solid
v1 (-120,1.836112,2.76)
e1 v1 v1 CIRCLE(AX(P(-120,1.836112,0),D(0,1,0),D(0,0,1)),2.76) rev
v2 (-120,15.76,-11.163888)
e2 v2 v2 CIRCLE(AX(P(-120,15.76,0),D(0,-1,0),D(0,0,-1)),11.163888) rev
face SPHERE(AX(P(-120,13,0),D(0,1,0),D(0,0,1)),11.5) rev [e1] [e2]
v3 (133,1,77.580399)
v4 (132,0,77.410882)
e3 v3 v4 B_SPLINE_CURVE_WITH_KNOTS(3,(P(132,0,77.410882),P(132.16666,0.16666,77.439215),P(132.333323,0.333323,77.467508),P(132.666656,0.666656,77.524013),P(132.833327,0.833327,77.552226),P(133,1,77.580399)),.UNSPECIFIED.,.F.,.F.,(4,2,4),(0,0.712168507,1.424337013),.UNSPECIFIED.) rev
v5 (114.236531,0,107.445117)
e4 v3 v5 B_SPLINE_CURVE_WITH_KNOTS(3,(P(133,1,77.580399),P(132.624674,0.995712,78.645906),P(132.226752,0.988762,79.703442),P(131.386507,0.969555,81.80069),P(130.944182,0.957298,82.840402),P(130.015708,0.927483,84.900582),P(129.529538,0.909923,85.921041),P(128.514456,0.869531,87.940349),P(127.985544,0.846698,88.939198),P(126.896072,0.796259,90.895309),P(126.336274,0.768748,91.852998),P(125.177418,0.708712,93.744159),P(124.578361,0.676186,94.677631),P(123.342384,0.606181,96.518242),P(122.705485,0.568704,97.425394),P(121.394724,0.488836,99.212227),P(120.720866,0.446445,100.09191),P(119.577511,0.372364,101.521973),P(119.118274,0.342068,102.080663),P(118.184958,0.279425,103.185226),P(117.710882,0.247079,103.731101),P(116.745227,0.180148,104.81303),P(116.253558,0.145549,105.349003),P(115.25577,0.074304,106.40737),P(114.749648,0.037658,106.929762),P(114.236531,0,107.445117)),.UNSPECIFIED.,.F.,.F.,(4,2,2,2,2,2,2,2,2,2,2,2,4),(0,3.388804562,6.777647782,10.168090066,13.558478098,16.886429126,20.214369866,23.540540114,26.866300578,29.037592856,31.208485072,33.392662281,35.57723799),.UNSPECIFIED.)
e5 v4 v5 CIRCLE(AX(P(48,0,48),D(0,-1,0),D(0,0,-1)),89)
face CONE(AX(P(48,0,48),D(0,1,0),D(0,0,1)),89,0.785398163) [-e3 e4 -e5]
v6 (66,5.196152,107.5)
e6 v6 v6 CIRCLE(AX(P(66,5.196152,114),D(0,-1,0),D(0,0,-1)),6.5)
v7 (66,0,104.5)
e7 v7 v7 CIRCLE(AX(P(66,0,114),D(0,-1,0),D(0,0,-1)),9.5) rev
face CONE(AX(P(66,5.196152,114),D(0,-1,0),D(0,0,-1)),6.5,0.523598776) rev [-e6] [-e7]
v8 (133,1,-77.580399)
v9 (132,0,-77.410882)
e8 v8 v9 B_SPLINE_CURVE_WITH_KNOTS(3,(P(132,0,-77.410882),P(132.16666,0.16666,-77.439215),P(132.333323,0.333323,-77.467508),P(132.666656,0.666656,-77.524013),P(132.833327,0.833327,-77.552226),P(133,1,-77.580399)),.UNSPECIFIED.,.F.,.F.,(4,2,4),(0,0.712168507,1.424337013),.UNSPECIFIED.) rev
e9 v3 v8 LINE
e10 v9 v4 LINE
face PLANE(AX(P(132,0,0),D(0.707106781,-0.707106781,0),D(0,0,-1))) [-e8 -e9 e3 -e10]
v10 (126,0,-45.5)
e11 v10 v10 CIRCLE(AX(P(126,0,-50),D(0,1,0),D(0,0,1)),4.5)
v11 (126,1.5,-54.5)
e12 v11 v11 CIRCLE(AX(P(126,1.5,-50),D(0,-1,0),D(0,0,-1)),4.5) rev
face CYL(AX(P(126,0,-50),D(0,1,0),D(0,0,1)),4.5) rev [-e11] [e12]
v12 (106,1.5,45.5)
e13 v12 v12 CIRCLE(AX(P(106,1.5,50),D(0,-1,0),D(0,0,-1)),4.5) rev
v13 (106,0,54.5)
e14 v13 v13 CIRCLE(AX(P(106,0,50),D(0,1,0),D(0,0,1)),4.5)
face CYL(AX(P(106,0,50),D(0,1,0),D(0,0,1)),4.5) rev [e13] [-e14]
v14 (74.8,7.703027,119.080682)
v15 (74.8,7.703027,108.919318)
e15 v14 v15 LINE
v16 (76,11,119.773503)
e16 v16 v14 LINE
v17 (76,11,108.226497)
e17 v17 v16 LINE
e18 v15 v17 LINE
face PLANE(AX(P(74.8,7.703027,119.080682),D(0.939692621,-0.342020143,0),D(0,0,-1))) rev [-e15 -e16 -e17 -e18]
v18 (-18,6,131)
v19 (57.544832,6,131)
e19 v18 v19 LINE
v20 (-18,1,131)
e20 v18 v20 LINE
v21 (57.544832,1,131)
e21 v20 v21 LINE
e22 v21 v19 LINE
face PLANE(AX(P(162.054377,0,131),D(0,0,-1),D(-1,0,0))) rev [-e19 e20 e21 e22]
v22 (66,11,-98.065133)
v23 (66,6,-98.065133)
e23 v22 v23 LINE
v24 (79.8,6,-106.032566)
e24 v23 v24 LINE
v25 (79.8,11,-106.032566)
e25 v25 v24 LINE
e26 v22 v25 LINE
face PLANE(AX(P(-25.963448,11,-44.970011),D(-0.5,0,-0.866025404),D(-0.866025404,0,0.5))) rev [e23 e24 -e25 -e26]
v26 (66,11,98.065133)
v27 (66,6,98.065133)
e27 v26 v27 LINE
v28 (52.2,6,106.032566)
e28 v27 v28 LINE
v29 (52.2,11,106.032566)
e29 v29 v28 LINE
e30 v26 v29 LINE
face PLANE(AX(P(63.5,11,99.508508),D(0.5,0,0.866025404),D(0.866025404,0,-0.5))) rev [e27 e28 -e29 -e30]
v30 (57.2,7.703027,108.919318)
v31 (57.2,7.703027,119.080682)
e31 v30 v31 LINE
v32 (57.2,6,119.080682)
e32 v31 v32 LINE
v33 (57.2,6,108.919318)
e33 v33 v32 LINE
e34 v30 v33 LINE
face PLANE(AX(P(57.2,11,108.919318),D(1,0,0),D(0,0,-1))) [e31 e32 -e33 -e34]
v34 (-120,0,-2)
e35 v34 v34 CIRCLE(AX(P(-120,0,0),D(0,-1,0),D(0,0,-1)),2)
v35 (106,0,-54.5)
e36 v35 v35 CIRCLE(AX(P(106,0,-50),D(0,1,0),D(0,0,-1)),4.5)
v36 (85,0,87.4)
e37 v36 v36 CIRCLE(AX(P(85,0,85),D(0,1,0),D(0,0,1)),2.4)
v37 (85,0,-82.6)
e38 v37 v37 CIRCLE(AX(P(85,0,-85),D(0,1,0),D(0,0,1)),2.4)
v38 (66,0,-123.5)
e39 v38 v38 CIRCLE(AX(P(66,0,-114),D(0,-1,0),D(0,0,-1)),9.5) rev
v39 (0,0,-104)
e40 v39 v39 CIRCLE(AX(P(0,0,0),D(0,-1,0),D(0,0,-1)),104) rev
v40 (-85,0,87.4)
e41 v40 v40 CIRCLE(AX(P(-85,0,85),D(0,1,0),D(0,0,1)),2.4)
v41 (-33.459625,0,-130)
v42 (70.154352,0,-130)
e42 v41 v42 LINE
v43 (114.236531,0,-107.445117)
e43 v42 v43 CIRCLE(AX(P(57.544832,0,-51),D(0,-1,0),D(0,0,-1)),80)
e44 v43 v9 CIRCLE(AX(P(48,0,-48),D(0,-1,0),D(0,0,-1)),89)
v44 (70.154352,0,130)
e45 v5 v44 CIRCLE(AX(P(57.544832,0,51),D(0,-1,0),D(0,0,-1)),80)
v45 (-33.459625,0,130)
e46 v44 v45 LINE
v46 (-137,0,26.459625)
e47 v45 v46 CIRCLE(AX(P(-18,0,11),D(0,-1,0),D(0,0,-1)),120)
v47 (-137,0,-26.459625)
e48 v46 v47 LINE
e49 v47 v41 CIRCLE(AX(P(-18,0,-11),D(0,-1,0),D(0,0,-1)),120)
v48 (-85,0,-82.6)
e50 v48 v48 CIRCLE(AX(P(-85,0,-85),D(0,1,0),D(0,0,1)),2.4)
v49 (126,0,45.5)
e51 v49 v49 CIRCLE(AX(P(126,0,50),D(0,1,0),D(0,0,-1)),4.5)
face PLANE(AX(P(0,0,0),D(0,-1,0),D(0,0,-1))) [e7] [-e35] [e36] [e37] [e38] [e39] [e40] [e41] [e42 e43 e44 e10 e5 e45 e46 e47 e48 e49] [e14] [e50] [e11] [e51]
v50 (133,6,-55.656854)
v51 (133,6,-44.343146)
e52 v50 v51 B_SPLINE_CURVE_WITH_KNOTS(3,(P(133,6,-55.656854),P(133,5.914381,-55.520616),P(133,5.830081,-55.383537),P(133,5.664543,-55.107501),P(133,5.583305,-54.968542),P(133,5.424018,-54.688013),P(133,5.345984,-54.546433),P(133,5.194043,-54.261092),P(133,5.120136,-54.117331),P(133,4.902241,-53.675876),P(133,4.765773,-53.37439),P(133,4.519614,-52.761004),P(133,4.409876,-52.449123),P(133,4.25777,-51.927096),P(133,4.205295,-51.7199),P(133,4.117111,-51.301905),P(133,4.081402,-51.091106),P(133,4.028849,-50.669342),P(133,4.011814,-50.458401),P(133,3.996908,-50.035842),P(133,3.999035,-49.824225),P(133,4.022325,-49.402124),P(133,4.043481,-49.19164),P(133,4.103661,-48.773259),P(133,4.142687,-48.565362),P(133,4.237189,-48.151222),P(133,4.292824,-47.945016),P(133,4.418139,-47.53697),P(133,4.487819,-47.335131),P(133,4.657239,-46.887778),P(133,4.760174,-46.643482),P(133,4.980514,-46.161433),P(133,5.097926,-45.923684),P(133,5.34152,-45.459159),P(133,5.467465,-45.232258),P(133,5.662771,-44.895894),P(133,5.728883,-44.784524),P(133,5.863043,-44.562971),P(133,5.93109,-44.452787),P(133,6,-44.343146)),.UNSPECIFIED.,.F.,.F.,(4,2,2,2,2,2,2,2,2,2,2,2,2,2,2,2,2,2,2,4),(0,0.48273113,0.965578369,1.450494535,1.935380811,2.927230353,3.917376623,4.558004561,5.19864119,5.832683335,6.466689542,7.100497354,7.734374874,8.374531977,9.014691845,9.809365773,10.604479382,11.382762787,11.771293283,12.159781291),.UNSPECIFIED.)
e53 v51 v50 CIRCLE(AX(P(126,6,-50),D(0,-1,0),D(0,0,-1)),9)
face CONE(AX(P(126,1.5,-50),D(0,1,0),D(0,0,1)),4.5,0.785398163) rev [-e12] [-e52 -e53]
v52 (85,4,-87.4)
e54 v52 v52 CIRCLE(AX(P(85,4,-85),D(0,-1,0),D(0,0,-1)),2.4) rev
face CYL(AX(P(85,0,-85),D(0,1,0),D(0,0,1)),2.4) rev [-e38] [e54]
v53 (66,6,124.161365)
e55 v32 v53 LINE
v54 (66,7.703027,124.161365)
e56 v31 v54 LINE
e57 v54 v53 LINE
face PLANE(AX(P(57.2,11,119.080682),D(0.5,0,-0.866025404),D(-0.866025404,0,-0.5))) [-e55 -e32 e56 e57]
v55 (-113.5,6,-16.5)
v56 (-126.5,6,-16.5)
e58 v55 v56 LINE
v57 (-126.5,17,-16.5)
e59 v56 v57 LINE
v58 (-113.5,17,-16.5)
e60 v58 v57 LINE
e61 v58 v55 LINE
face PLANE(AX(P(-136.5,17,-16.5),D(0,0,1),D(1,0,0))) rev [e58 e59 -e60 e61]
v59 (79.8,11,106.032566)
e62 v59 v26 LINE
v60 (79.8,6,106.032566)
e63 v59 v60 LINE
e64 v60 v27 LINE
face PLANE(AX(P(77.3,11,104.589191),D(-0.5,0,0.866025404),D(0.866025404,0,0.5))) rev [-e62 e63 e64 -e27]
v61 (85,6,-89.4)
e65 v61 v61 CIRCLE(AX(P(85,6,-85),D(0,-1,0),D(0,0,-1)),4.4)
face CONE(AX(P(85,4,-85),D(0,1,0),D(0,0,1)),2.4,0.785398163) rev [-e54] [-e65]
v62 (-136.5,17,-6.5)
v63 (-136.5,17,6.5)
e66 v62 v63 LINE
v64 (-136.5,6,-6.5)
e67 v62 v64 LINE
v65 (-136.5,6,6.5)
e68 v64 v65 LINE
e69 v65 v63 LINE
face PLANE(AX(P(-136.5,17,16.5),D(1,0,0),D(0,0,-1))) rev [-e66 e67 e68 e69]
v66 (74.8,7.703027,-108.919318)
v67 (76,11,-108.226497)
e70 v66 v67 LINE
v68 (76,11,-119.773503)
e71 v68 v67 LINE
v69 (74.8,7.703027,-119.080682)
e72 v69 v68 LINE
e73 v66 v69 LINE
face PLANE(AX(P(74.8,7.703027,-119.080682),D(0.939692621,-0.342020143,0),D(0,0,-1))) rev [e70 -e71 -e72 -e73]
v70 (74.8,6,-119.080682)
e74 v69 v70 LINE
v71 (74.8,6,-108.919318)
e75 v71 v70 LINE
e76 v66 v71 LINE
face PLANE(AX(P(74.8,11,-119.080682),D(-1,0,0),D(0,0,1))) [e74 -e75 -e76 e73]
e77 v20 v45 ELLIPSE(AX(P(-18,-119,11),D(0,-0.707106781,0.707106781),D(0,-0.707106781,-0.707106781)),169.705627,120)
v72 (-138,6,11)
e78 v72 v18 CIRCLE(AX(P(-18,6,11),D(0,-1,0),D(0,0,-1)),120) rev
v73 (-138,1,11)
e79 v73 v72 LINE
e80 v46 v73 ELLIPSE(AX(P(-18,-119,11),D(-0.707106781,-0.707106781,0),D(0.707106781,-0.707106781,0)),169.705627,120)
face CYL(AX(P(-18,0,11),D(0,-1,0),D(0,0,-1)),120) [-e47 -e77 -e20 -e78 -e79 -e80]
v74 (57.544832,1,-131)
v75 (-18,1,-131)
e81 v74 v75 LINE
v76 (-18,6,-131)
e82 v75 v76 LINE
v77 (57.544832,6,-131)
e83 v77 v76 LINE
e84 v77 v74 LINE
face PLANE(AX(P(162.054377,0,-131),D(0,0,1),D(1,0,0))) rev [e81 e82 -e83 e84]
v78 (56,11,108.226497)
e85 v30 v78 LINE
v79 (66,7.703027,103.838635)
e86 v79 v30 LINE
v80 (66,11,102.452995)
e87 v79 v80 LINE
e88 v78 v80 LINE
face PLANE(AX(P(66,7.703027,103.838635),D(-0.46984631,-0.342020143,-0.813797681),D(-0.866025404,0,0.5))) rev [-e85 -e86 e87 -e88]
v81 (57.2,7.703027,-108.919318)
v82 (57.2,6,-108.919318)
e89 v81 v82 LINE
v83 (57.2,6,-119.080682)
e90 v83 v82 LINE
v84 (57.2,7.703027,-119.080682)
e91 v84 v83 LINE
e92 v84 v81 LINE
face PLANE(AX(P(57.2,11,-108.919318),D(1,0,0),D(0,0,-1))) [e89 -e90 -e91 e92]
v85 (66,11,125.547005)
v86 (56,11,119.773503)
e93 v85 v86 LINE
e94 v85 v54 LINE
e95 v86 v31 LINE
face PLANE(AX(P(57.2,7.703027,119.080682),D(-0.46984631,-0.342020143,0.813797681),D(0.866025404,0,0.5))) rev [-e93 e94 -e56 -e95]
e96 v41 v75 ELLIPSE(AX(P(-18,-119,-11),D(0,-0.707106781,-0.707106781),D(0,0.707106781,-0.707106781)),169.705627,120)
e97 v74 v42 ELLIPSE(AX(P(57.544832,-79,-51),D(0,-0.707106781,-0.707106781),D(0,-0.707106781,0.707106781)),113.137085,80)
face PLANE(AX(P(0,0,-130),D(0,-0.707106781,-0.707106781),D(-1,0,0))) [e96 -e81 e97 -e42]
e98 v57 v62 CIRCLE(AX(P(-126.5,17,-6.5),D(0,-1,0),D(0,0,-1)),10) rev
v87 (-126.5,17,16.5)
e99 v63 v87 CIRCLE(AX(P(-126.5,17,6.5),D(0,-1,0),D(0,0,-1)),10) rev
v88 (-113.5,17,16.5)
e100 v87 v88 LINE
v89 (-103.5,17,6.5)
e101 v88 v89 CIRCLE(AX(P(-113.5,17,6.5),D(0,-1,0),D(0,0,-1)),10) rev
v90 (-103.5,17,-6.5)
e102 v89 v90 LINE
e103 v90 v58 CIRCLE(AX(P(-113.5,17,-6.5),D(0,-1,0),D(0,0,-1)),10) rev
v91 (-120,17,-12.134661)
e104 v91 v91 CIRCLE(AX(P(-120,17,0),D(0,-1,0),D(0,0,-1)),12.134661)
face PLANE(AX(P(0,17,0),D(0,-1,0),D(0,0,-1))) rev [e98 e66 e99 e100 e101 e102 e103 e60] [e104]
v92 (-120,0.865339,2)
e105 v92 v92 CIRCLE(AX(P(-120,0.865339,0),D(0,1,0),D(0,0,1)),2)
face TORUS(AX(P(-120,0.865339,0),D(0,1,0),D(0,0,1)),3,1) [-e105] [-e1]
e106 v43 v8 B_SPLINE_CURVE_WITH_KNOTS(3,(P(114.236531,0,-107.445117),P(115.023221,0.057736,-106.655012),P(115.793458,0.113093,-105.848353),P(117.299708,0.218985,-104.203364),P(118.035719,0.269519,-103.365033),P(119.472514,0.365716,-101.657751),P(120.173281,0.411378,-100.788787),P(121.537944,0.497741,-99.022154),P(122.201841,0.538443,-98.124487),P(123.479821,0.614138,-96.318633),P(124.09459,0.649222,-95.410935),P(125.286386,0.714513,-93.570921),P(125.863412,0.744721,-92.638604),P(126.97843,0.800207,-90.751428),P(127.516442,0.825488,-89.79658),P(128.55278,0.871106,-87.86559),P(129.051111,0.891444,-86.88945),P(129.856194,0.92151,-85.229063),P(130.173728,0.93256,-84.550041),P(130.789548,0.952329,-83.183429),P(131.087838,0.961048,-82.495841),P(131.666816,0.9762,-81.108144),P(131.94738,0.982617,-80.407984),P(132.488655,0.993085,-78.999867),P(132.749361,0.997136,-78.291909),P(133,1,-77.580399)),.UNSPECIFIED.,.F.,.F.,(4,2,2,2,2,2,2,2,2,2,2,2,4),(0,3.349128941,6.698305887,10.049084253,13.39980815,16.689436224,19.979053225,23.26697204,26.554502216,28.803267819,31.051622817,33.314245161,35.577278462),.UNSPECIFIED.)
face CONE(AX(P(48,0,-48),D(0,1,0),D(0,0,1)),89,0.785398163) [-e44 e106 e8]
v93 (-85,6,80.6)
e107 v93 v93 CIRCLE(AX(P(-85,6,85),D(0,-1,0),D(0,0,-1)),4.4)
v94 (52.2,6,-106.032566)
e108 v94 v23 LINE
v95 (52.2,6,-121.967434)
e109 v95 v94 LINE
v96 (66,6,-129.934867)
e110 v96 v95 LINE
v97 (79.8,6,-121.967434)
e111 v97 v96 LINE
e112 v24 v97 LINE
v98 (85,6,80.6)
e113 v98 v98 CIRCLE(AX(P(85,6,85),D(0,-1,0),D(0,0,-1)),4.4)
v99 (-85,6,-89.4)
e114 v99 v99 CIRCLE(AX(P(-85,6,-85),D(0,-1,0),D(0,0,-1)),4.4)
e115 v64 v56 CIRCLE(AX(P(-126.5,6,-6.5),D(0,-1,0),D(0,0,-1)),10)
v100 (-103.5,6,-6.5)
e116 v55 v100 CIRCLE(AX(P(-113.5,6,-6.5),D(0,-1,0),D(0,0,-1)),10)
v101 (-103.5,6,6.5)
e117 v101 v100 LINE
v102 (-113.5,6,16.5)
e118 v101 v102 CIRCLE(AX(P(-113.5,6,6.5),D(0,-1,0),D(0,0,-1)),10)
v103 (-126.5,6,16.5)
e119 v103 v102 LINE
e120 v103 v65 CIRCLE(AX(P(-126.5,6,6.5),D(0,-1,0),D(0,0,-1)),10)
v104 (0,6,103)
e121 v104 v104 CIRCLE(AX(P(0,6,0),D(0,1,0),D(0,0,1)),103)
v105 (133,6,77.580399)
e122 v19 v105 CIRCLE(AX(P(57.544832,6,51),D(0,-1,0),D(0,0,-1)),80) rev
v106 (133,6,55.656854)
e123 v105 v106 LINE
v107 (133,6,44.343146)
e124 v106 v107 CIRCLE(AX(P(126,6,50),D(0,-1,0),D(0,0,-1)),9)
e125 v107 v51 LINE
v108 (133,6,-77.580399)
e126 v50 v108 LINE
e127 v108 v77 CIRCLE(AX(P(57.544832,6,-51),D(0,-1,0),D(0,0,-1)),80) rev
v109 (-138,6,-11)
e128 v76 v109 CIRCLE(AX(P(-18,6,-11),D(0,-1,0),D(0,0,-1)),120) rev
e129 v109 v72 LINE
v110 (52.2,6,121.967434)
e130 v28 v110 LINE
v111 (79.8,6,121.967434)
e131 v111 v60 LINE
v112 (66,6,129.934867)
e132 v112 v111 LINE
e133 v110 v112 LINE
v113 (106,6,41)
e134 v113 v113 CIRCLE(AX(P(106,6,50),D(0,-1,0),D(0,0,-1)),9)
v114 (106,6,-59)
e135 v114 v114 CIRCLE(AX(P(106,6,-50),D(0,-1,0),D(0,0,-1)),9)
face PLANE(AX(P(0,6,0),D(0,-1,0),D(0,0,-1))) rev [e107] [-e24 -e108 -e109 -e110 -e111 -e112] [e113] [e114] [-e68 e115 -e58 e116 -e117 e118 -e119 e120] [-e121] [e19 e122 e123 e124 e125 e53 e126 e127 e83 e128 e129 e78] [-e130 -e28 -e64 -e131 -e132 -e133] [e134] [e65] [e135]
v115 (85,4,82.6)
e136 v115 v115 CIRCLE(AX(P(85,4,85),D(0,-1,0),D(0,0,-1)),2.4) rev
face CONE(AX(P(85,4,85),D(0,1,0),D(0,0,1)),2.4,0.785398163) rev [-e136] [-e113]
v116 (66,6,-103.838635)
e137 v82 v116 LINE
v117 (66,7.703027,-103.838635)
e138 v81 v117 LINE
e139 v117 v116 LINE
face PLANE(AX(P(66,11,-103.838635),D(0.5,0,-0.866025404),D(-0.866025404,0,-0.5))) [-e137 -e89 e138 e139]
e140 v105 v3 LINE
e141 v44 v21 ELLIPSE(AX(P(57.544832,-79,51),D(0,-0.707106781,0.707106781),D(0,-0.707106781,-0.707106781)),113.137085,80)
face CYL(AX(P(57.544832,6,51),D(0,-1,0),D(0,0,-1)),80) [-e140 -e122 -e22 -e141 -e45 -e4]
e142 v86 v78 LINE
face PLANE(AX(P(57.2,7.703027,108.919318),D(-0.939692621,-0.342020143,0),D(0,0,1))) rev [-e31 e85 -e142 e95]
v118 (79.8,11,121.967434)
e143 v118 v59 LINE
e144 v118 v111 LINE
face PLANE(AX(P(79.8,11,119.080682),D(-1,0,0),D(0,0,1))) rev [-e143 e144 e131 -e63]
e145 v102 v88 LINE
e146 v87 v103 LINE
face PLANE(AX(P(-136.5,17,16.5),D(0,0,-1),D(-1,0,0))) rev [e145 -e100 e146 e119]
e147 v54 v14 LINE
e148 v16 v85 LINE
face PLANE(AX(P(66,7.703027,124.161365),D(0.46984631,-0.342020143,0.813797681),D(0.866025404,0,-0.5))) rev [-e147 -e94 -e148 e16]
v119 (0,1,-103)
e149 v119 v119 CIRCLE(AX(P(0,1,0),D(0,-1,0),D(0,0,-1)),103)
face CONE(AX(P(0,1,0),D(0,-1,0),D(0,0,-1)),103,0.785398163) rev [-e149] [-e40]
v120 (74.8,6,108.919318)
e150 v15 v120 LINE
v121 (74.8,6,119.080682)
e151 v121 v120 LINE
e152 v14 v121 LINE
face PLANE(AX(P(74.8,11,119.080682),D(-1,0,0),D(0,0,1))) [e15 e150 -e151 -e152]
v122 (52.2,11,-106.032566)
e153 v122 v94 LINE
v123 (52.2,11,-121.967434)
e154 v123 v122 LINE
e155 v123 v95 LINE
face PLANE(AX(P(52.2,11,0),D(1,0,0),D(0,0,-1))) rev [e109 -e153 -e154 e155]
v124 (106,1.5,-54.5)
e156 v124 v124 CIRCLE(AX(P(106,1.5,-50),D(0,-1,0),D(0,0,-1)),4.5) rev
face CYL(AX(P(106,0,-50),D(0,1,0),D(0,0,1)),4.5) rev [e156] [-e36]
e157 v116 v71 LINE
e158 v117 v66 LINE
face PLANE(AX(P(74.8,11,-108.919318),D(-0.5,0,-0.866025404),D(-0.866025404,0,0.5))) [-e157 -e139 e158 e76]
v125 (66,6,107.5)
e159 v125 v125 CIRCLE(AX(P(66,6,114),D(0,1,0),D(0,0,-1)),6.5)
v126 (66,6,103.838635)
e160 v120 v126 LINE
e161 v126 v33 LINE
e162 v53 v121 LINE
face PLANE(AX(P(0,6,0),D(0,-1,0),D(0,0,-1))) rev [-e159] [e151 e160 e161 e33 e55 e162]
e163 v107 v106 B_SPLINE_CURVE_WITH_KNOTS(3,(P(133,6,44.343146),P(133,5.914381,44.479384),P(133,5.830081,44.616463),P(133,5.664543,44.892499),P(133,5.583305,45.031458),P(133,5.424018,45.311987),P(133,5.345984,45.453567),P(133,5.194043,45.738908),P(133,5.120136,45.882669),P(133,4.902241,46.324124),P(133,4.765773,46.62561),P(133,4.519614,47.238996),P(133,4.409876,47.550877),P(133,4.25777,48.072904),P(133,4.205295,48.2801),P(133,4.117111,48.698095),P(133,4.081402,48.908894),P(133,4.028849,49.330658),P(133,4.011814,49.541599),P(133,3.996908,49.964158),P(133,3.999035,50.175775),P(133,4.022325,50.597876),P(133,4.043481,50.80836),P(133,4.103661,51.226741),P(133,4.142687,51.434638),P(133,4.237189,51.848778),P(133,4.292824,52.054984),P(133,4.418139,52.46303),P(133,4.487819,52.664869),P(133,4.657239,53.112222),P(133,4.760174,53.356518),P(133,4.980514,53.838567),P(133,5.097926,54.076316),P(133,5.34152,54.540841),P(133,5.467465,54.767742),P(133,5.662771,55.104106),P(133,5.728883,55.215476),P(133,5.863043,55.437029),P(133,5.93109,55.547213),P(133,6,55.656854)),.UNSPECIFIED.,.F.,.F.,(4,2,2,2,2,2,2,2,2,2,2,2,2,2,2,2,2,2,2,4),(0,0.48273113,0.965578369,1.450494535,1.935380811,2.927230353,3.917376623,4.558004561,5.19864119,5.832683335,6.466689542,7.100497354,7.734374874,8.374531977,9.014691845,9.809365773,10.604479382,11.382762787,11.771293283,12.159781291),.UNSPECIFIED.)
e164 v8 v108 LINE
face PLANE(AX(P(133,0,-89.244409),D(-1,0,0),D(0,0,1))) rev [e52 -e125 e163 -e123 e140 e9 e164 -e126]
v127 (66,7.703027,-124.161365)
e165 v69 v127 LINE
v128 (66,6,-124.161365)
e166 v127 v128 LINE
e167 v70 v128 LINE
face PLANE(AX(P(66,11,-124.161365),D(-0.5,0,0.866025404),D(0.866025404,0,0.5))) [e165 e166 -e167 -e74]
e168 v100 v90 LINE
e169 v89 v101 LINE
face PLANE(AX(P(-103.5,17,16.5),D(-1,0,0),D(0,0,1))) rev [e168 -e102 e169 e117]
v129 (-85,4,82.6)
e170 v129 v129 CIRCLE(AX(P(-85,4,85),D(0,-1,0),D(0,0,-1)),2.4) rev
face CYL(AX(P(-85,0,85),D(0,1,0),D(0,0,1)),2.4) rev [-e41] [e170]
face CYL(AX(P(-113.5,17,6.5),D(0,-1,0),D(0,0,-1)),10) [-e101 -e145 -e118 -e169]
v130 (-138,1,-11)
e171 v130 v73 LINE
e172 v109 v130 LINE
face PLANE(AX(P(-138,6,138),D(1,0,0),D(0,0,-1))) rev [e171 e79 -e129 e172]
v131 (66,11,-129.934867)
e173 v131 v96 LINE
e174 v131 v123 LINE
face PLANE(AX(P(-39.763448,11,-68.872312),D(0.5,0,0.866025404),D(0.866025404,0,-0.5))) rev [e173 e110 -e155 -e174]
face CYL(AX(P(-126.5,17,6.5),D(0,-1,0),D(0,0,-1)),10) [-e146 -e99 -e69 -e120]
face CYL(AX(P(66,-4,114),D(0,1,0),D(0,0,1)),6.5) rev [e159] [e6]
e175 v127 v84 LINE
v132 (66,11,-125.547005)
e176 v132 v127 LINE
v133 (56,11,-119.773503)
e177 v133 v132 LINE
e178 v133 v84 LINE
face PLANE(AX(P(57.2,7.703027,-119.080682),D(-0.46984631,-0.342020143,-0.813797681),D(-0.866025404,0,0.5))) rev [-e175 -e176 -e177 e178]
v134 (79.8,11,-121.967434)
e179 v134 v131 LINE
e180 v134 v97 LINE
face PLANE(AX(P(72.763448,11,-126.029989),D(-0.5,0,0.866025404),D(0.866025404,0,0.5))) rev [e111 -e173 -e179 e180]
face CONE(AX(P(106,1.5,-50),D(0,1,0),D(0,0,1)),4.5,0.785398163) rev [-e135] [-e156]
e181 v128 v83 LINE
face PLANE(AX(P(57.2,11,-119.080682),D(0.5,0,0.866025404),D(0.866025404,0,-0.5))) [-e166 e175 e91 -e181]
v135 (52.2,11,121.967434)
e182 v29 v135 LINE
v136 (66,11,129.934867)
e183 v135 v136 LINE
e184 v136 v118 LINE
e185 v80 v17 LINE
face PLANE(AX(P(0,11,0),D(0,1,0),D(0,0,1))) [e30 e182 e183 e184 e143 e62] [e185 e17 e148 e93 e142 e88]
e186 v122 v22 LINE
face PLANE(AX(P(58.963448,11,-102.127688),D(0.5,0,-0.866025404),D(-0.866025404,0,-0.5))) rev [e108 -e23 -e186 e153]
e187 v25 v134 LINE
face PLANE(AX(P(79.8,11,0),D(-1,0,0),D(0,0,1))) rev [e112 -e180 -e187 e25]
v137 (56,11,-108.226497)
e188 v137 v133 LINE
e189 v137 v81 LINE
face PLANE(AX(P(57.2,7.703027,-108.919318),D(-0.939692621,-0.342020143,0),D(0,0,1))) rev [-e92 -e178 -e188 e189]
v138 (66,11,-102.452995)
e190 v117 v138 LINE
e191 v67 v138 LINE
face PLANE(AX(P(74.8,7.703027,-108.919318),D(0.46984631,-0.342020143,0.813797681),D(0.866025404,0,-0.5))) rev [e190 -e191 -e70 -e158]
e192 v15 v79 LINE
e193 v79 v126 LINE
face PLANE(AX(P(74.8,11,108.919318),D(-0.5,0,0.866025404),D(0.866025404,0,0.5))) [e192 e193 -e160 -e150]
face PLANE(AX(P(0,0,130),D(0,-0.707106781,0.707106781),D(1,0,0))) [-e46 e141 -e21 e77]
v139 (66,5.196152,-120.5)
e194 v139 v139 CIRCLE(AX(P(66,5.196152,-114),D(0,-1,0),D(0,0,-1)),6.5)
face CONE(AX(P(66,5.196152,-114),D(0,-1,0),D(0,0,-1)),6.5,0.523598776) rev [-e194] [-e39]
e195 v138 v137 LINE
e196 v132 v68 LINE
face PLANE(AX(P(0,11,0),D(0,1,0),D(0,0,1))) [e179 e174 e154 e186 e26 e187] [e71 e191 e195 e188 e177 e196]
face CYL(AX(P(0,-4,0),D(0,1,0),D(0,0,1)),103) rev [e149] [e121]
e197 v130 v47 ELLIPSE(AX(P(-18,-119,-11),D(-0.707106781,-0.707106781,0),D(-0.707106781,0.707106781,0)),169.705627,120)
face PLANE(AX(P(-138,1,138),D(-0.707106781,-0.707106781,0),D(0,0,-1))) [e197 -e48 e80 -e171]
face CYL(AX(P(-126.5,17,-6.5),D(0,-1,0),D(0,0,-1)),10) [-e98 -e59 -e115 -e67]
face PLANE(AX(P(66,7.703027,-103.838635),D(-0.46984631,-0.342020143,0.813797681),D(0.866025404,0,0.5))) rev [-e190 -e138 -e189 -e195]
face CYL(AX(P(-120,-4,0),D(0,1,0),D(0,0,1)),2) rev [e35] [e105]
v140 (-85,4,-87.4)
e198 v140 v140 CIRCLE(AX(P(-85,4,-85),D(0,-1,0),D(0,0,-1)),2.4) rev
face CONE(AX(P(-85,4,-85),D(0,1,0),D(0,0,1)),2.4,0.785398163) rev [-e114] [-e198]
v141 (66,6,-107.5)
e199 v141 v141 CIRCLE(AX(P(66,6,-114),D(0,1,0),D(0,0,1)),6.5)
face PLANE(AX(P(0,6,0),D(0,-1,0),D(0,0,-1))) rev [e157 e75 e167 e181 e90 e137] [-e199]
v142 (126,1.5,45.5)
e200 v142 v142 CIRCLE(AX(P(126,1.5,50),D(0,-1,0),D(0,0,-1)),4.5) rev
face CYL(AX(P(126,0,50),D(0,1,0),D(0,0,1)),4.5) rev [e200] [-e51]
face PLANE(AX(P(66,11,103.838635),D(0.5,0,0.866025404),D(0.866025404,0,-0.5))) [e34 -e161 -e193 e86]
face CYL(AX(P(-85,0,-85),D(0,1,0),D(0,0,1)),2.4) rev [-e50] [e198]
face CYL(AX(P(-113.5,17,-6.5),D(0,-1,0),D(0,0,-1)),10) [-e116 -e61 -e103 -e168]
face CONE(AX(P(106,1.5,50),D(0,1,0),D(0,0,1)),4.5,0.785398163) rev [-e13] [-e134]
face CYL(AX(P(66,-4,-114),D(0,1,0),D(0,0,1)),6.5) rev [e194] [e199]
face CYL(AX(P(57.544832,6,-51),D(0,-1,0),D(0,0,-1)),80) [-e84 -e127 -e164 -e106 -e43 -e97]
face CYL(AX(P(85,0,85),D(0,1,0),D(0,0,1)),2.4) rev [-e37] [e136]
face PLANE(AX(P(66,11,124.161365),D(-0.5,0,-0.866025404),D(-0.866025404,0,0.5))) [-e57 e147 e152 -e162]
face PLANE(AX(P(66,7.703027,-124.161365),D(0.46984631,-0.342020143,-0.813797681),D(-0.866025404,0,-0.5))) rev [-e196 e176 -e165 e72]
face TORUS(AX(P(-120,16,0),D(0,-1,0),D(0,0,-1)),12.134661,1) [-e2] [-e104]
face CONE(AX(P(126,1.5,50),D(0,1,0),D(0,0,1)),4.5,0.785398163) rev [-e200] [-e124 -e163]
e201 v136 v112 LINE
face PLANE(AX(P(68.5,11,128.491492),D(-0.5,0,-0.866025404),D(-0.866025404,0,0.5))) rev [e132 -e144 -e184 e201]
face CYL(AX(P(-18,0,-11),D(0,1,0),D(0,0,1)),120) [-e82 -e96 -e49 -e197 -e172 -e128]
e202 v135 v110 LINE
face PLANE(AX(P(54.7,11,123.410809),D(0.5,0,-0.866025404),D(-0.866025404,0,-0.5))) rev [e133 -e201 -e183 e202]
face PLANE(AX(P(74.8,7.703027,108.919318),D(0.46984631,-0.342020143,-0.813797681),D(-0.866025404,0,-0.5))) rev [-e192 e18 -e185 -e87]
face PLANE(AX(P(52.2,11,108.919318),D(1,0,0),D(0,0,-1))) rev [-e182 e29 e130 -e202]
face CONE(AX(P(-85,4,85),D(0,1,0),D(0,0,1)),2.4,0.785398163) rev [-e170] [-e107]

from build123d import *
from OCP.BRepFilletAPI import BRepFilletAPI_MakeChamfer

# Parameters (mm, degrees)
SKETCH_1_W           = 276
SKETCH_1_H           = 276
EXTRUDE_1_DEPTH      = 6
SKETCH_4_R           = 6.5
SKETCH_4_R_2         = 2
CUT_EXTRUDE_1_DEPTH  = 10
SKETCH_5_R           = 2.4
CUT_EXTRUDE_2_DEPTH  = 196.253681143
FILLET_1_R           = 90
EXTRUDE_1_2_DEPTH    = 5
CHAMFER_2_SIZE       = 1.2
CHAMFER_2_SIZE2      = 3.296972903
SKETCH_9_W           = 33
SKETCH_9_H           = 33
EXTRUDE_2_DEPTH      = 11
FILLET_2_R           = 1
FILLET_3_R           = 10
CHAMFER_5_SIZE       = 3
CHAMFER_5_SIZE2      = 5.196152423
SKETCH_6_R           = 103
CUT_EXTRUDE_3_DEPTH  = 10
CHAMFER_6_SIZE       = 2
SKETCH_13_R          = 4.5
CUT_EXTRUDE_6_DEPTH  = 196.47122551
SKETCH_18_W          = 352.666964083
SKETCH_18_H          = 12.846548741
SKETCH_18_W_2        = 47.896370642
SKETCH_18_H_2        = 198.133814491
CUT_EXTRUDE_10_DEPTH = 196.900484949
CHAMFER_7_SIZE       = 4.5
CHAMFER_8_SIZE       = 1
FILLET_4_R           = 120
FILLET_5_R           = 80


with BuildPart() as part:
    # Эскиз1 → Extrude 1 (new body)
    with BuildSketch(Plane(origin=(0, 0, 0), x_dir=(1, 0, 0), z_dir=(0, 1, 0))):
        Rectangle(SKETCH_1_W, SKETCH_1_H)
    extrude(amount=EXTRUDE_1_DEPTH)

    # Эскиз4 → Cut-Extrude 1 (cut)
    with BuildSketch(Plane(origin=(0, 6, 0), x_dir=(1, 0, 0), z_dir=(0, 1, 0))):
        with Locations(Location((66, 114, 0), (0, 0, 270))):
            Circle(SKETCH_4_R)
        with Locations(Location((-120, 0, 0), (0, 0, 270))):
            Circle(SKETCH_4_R_2)
        with Locations(Location((66, -114, 0), (0, 0, 90))):
            Circle(SKETCH_4_R)
    extrude(amount=-CUT_EXTRUDE_1_DEPTH, mode=Mode.SUBTRACT)

    # Эскиз5 → Вырез-Вытянуть2 (cut, through all)
    with BuildSketch(Plane(origin=(0, 6, 0), x_dir=(1, 0, 0), z_dir=(0, 1, 0))):
        with Locations(Location((-85, 85, 0), (0, 0, 270))):
            Circle(SKETCH_5_R)
        with Locations(Location((85, 85, 0), (0, 0, 270))):
            Circle(SKETCH_5_R)
        with Locations(Location((85, -85, 0), (0, 0, 270))):
            Circle(SKETCH_5_R)
        with Locations(Location((-85, -85, 0), (0, 0, 270))):
            Circle(SKETCH_5_R)
        with Locations(Location((-90, 0, 0), (0, 0, 270))):
            Circle(SKETCH_5_R)
        with Locations(Location((0, 90, 0), (0, 0, 270))):
            Circle(SKETCH_5_R)
        with Locations(Location((0, -90, 0), (0, 0, 90))):
            Circle(SKETCH_5_R)
        with Locations(Location((90, 0, 0), (0, 0, 90))):
            Circle(SKETCH_5_R)
    extrude(amount=-CUT_EXTRUDE_2_DEPTH, mode=Mode.SUBTRACT)

    # Скругление1
    fillet_1_edges = [part.edges().sort_by_distance(p)[0] for p in [
        (138, 3, 138),
        (-138, 3, 138),
        (-138, 3, -138),
        (138, 3, -138),
    ]]
    fillet(fillet_1_edges, radius=FILLET_1_R)

    # Extrude 1 2: read off the stored shape, not the designer's step
    # Extrude 1 2 outline → Extrude 1 2 (add)
    # profile 1 of 2: a face of its own
    with BuildSketch(Plane(origin=(0, 6, 0), x_dir=(1, 0, 0), z_dir=(0, 1, 0))):
        Polygon((79.8, -106.032566285), (66, -98.06513257), (52.2, -106.032566285), (52.2, -121.967433715), (66, -129.93486743), (79.8, -121.967433715), align=None)
        Polygon((57.2, -108.919317631), (66, -103.838635262), (74.8, -108.919317631), (74.8, -119.080682369), (66, -124.161364738), (57.2, -119.080682369), align=None, mode=Mode.SUBTRACT)
    # profile 2 of 2: a face of its own
    with BuildSketch(Plane(origin=(0, 6, 0), x_dir=(1, 0, 0), z_dir=(0, 1, 0))):
        Polygon((52.2, 121.967433715), (52.2, 106.032566285), (66, 98.06513257), (79.8, 106.032566285), (79.8, 121.967433715), (66, 129.93486743), align=None)
        Polygon((66, 103.838635262), (57.2, 108.919317631), (57.2, 119.080682369), (66, 124.161364738), (74.8, 119.080682369), (74.8, 108.919317631), align=None, mode=Mode.SUBTRACT)
    extrude(amount=EXTRUDE_1_2_DEPTH)

    # Фаска2: one chamfer whose edges measure the first distance from different faces: ONE call of the kernel's chamfer builder (chamfer() names one face for all edges)
    chamfer_2_edges_1 = [part.edges().sort_by_distance(p)[0] for p in [
        (70.4, 11, 106.378976446),
        (61.6, 11, 106.378976447),
        (57.2, 11, 114),
        (61.6, 11, 121.621023554),
        (70.4, 11, 121.621023553),
        (74.8, 11, 114),
    ]]
    chamfer_2_side_1 = [part.faces().sort_by_distance(p)[0] for p in [
        (72.689201518, 11, 102.413963108),
    ]]
    chamfer_2_edges_2 = [part.edges().sort_by_distance(p)[0] for p in [
        (74.8, 11, -114),
        (70.4, 11, -121.621023554),
        (61.6, 11, -121.621023553),
        (57.2, 11, -114),
        (61.6, 11, -106.378976446),
        (70.4, 11, -106.378976447),
    ]]
    chamfer_2_side_2 = [part.faces().sort_by_distance(p)[0] for p in [
        (52.621596964, 11, -114),
    ]]
    chamfer_2 = BRepFilletAPI_MakeChamfer(part.part.solid().wrapped)
    for e in chamfer_2_edges_1:
        chamfer_2.Add(CHAMFER_2_SIZE, CHAMFER_2_SIZE2, e.wrapped, chamfer_2_side_1[0].wrapped)  # the first distance lies on this face
    for e in chamfer_2_edges_2:
        chamfer_2.Add(CHAMFER_2_SIZE, CHAMFER_2_SIZE2, e.wrapped, chamfer_2_side_2[0].wrapped)  # the first distance lies on this face
    add(Compound.cast(chamfer_2.Shape()), mode=Mode.REPLACE)

    # Эскиз9 → Бобышка-Вытянуть2 (add)
    with BuildSketch(Plane(origin=(0, 6, 0), x_dir=(1, 0, 0), z_dir=(0, 1, 0))):
        with Locations((-120, 0)):
            Rectangle(SKETCH_9_W, SKETCH_9_H)
    extrude(amount=EXTRUDE_2_DEPTH)

    # Эскиз10 → Вырез-Повернуть1 (revolve, cut)
    with BuildSketch(Plane(origin=(0, 13, 0), x_dir=(1, 0, 0), z_dir=(0, 1, 0))):
        with BuildLine():
            Line((-131.5, 0), (-108.5, 0))
            ThreePointArc((-108.5, 0), (-120, 11.5), (-131.5, 0))
        make_face()
    revolve(axis=Axis((-131.5, 13, 0), (1, 0, 0)), mode=Mode.SUBTRACT)

    # Скругление2
    fillet_2_edges = [part.edges().sort_by_distance(p)[0] for p in [
        (-119.999999999, 1.675248347, -1.999999986),
        (-120, 17, -10.781929326),
    ]]
    fillet(fillet_2_edges, radius=FILLET_2_R)

    # Скругление3
    fillet_3_edges = [part.edges().sort_by_distance(p)[0] for p in [
        (-103.5, 11.5, 16.5),
        (-103.5, 11.5, -16.5),
        (-136.5, 11.5, -16.5),
        (-136.5, 11.5, 16.5),
    ]]
    fillet(fillet_3_edges, radius=FILLET_3_R)

    # Фаска5
    chamfer_5_edges = [part.edges().sort_by_distance(p)[0] for p in [
        (66, 0, 120.5),
        (66, 0, -120.5),
    ]]
    chamfer_5_side = [part.faces().sort_by_distance(p)[0] for p in [
        (-0.232742345, 0, 0),
    ]]
    chamfer(chamfer_5_edges, length=CHAMFER_5_SIZE, length2=CHAMFER_5_SIZE2, reference=chamfer_5_side[0])

    # Эскиз6 → Вырез-Вытянуть3 (cut)
    with BuildSketch(Plane(origin=(0, 6, 0), x_dir=(1, 0, 0), z_dir=(0, 1, 0))):
        with Locations(Location((0, 0, 0), (0, 0, 270))):
            Circle(SKETCH_6_R)
    extrude(amount=-CUT_EXTRUDE_3_DEPTH, mode=Mode.SUBTRACT)

    # Фаска6
    chamfer_6_edges = [part.edges().sort_by_distance(p)[0] for p in [
        (85, 6, -87.4),
        (85, 6, 82.6),
        (-85, 6, 82.6),
        (-85, 6, -87.4),
    ]]
    chamfer(chamfer_6_edges, length=CHAMFER_6_SIZE)

    # Эскиз13 → Вырез-Вытянуть6 (cut, through all)
    with BuildSketch(Plane(origin=(0, 6, 0), x_dir=(1, 0, 0), z_dir=(0, 1, 0))):
        with Locations(Location((126, 50, 0), (0, 0, 270))):
            Circle(SKETCH_13_R)
        with Locations(Location((126, -50, 0), (0, 0, 90))):
            Circle(SKETCH_13_R)
        with Locations(Location((106, -50, 0), (0, 0, 270))):
            Circle(SKETCH_13_R)
        with Locations(Location((106, 50, 0), (0, 0, 90))):
            Circle(SKETCH_13_R)
    extrude(amount=-CUT_EXTRUDE_6_DEPTH, mode=Mode.SUBTRACT)

    # Эскиз18 → Вырез-Вытянуть10 (cut, through all)
    with BuildSketch(Plane(origin=(0, 17, 0), x_dir=(1, 0, 0), z_dir=(0, 1, 0))):
        with Locations((-14.279105497, 137.42327437)):
            Rectangle(SKETCH_18_W, SKETCH_18_H)
        with Locations((-14.279105497, -137.42327437)):
            Rectangle(SKETCH_18_W, SKETCH_18_H)
        with Locations((156.948185321, -9.822497885)):
            Rectangle(SKETCH_18_W_2, SKETCH_18_H_2)
    extrude(amount=-CUT_EXTRUDE_10_DEPTH, mode=Mode.SUBTRACT)

    # Фаска7
    # the kernel refuses this chamfer: 4.5 mm, written as the material it takes off along each edge
    with BuildSketch(Plane(origin=(106, 6, -50), x_dir=(0, 0, -1), z_dir=(1, 0, 0))) as chamfer_7_piece_1:
        Polygon((4.5 + CHAMFER_7_SIZE, 0), (4.5, -CHAMFER_7_SIZE), (4.5, 0), align=None)
    revolve(axis=Axis((106, 6, -50), (0, 1, 0)), mode=Mode.SUBTRACT)
    with BuildSketch(Plane(origin=(106, 6, 50), x_dir=(0, 0, 1), z_dir=(-1, 0, 0))) as chamfer_7_piece_2:
        Polygon((4.5 + CHAMFER_7_SIZE, 0), (4.5, -CHAMFER_7_SIZE), (4.5, 0), align=None)
    revolve(axis=Axis((106, 6, 50), (0, 1, 0)), mode=Mode.SUBTRACT)
    with BuildSketch(Plane(origin=(126, 6, 50), x_dir=(0, 0, -1), z_dir=(1, 0, 0))) as chamfer_7_piece_3:
        Polygon((4.5 + CHAMFER_7_SIZE, 0), (4.5, -CHAMFER_7_SIZE), (4.5, 0), align=None)
    revolve(axis=Axis((126, 6, 50), (0, 1, 0)), mode=Mode.SUBTRACT)
    with BuildSketch(Plane(origin=(126, 6, -50), x_dir=(0, 0, 1), z_dir=(-1, 0, 0))) as chamfer_7_piece_4:
        Polygon((4.5 + CHAMFER_7_SIZE, 0), (4.5, -CHAMFER_7_SIZE), (4.5, 0), align=None)
    revolve(axis=Axis((126, 6, -50), (0, 1, 0)), mode=Mode.SUBTRACT)

    # Фаска8
    chamfer_8_edges = [part.edges().sort_by_distance(p)[0] for p in [
        (0, 0, -103),
        (113.584975562, 0, 109.632872564),
        (113.584975562, 0, -109.632872564),
        (-122.939803427, 0, 97.840002631),
        (0, 0, -131),
        (0, 0, 131),
        (133, 0, 0),
        (-138, 0, 0),
        (-122.939803427, 0, -97.840002631),
    ]]
    chamfer(chamfer_8_edges, length=CHAMFER_8_SIZE)

    # Скругление4
    # the kernel refuses this fillet: 120 mm, written as the material it takes off along each edge
    with BuildSketch(Plane(origin=(-82.799425283, -329.218710186, 131), x_dir=(1, 0, 0), z_dir=(0, 1, 0))) as fillet_4_piece_1:
        with BuildLine():
            CenterArc((64.799425283, 120), FILLET_4_R, 180, 90)
            Line((-55.200574717, 120), (-67.200574717, 120))
            ThreePointArc((-67.200574717, 120), (-67.200574717, 83), (-4.639923371, -11.066666667))
            Line((-4.639923371, -11.066666667), (0, -12))
            Line((0, -12), (64.799425283, -12))
            Line((64.799425283, -12), (64.799425283, 0))
        make_face()
    extrude(amount=665.437420372, mode=Mode.SUBTRACT)
    with BuildSketch(Plane(origin=(-82.799425283, -329.218710186, -131), x_dir=(1, 0, 0), z_dir=(0, 1, 0))) as fillet_4_piece_2:
        with BuildLine():
            CenterArc((64.799425283, -120), FILLET_4_R, 90, 90)
            Line((-55.200574717, -120), (-67.200574717, -120))
            ThreePointArc((-67.200574717, -120), (-67.200574717, -83), (-4.639923371, 11.066666667))
            Line((-4.639923371, 11.066666667), (0, 12))
            Line((0, 12), (64.799425283, 12))
            Line((64.799425283, 12), (64.799425283, 0))
        make_face()
    extrude(amount=665.437420372, mode=Mode.SUBTRACT)

    # Скругление5
    # the kernel refuses this fillet: 80 mm, written as the material it takes off along each edge
    with BuildSketch(Plane(origin=(82.799425283, -182.264690441, -131), x_dir=(-1, 0, 0), z_dir=(0, 1, 0))) as fillet_5_piece_1:
        with BuildLine():
            CenterArc((25.254593386, 80), FILLET_5_R, 199.405701267, 70.594298733)
            Line((-50.200574717, 53.419601085), (-51.709678079, 52.887993106))
            ThreePointArc((-51.709678079, 52.887993106), (-31.951505401, 20.271431924), (-0.618656449, -1.475555556))
            Line((-0.618656449, -1.475555556), (0, -1.6))
            Line((0, -1.6), (25.254593386, -1.6))
            Line((25.254593386, -1.6), (25.254593386, 0))
        make_face()
    extrude(amount=371.529380882, mode=Mode.SUBTRACT)
    with BuildSketch(Plane(origin=(82.799425283, -182.264690441, 131), x_dir=(-1, 0, 0), z_dir=(0, 1, 0))) as fillet_5_piece_2:
        with BuildLine():
            CenterArc((25.254593386, -80), FILLET_5_R, 90, 70.594298733)
            Line((-50.200574717, -53.419601085), (-51.709678079, -52.887993106))
            ThreePointArc((-51.709678079, -52.887993106), (-31.951505401, -20.271431924), (-0.618656449, 1.475555556))
            Line((-0.618656449, 1.475555556), (0, 1.6))
            Line((0, 1.6), (25.254593386, 1.6))
            Line((25.254593386, 1.6), (25.254593386, 0))
        make_face()
    extrude(amount=371.529380882, mode=Mode.SUBTRACT)


solid = part.part
